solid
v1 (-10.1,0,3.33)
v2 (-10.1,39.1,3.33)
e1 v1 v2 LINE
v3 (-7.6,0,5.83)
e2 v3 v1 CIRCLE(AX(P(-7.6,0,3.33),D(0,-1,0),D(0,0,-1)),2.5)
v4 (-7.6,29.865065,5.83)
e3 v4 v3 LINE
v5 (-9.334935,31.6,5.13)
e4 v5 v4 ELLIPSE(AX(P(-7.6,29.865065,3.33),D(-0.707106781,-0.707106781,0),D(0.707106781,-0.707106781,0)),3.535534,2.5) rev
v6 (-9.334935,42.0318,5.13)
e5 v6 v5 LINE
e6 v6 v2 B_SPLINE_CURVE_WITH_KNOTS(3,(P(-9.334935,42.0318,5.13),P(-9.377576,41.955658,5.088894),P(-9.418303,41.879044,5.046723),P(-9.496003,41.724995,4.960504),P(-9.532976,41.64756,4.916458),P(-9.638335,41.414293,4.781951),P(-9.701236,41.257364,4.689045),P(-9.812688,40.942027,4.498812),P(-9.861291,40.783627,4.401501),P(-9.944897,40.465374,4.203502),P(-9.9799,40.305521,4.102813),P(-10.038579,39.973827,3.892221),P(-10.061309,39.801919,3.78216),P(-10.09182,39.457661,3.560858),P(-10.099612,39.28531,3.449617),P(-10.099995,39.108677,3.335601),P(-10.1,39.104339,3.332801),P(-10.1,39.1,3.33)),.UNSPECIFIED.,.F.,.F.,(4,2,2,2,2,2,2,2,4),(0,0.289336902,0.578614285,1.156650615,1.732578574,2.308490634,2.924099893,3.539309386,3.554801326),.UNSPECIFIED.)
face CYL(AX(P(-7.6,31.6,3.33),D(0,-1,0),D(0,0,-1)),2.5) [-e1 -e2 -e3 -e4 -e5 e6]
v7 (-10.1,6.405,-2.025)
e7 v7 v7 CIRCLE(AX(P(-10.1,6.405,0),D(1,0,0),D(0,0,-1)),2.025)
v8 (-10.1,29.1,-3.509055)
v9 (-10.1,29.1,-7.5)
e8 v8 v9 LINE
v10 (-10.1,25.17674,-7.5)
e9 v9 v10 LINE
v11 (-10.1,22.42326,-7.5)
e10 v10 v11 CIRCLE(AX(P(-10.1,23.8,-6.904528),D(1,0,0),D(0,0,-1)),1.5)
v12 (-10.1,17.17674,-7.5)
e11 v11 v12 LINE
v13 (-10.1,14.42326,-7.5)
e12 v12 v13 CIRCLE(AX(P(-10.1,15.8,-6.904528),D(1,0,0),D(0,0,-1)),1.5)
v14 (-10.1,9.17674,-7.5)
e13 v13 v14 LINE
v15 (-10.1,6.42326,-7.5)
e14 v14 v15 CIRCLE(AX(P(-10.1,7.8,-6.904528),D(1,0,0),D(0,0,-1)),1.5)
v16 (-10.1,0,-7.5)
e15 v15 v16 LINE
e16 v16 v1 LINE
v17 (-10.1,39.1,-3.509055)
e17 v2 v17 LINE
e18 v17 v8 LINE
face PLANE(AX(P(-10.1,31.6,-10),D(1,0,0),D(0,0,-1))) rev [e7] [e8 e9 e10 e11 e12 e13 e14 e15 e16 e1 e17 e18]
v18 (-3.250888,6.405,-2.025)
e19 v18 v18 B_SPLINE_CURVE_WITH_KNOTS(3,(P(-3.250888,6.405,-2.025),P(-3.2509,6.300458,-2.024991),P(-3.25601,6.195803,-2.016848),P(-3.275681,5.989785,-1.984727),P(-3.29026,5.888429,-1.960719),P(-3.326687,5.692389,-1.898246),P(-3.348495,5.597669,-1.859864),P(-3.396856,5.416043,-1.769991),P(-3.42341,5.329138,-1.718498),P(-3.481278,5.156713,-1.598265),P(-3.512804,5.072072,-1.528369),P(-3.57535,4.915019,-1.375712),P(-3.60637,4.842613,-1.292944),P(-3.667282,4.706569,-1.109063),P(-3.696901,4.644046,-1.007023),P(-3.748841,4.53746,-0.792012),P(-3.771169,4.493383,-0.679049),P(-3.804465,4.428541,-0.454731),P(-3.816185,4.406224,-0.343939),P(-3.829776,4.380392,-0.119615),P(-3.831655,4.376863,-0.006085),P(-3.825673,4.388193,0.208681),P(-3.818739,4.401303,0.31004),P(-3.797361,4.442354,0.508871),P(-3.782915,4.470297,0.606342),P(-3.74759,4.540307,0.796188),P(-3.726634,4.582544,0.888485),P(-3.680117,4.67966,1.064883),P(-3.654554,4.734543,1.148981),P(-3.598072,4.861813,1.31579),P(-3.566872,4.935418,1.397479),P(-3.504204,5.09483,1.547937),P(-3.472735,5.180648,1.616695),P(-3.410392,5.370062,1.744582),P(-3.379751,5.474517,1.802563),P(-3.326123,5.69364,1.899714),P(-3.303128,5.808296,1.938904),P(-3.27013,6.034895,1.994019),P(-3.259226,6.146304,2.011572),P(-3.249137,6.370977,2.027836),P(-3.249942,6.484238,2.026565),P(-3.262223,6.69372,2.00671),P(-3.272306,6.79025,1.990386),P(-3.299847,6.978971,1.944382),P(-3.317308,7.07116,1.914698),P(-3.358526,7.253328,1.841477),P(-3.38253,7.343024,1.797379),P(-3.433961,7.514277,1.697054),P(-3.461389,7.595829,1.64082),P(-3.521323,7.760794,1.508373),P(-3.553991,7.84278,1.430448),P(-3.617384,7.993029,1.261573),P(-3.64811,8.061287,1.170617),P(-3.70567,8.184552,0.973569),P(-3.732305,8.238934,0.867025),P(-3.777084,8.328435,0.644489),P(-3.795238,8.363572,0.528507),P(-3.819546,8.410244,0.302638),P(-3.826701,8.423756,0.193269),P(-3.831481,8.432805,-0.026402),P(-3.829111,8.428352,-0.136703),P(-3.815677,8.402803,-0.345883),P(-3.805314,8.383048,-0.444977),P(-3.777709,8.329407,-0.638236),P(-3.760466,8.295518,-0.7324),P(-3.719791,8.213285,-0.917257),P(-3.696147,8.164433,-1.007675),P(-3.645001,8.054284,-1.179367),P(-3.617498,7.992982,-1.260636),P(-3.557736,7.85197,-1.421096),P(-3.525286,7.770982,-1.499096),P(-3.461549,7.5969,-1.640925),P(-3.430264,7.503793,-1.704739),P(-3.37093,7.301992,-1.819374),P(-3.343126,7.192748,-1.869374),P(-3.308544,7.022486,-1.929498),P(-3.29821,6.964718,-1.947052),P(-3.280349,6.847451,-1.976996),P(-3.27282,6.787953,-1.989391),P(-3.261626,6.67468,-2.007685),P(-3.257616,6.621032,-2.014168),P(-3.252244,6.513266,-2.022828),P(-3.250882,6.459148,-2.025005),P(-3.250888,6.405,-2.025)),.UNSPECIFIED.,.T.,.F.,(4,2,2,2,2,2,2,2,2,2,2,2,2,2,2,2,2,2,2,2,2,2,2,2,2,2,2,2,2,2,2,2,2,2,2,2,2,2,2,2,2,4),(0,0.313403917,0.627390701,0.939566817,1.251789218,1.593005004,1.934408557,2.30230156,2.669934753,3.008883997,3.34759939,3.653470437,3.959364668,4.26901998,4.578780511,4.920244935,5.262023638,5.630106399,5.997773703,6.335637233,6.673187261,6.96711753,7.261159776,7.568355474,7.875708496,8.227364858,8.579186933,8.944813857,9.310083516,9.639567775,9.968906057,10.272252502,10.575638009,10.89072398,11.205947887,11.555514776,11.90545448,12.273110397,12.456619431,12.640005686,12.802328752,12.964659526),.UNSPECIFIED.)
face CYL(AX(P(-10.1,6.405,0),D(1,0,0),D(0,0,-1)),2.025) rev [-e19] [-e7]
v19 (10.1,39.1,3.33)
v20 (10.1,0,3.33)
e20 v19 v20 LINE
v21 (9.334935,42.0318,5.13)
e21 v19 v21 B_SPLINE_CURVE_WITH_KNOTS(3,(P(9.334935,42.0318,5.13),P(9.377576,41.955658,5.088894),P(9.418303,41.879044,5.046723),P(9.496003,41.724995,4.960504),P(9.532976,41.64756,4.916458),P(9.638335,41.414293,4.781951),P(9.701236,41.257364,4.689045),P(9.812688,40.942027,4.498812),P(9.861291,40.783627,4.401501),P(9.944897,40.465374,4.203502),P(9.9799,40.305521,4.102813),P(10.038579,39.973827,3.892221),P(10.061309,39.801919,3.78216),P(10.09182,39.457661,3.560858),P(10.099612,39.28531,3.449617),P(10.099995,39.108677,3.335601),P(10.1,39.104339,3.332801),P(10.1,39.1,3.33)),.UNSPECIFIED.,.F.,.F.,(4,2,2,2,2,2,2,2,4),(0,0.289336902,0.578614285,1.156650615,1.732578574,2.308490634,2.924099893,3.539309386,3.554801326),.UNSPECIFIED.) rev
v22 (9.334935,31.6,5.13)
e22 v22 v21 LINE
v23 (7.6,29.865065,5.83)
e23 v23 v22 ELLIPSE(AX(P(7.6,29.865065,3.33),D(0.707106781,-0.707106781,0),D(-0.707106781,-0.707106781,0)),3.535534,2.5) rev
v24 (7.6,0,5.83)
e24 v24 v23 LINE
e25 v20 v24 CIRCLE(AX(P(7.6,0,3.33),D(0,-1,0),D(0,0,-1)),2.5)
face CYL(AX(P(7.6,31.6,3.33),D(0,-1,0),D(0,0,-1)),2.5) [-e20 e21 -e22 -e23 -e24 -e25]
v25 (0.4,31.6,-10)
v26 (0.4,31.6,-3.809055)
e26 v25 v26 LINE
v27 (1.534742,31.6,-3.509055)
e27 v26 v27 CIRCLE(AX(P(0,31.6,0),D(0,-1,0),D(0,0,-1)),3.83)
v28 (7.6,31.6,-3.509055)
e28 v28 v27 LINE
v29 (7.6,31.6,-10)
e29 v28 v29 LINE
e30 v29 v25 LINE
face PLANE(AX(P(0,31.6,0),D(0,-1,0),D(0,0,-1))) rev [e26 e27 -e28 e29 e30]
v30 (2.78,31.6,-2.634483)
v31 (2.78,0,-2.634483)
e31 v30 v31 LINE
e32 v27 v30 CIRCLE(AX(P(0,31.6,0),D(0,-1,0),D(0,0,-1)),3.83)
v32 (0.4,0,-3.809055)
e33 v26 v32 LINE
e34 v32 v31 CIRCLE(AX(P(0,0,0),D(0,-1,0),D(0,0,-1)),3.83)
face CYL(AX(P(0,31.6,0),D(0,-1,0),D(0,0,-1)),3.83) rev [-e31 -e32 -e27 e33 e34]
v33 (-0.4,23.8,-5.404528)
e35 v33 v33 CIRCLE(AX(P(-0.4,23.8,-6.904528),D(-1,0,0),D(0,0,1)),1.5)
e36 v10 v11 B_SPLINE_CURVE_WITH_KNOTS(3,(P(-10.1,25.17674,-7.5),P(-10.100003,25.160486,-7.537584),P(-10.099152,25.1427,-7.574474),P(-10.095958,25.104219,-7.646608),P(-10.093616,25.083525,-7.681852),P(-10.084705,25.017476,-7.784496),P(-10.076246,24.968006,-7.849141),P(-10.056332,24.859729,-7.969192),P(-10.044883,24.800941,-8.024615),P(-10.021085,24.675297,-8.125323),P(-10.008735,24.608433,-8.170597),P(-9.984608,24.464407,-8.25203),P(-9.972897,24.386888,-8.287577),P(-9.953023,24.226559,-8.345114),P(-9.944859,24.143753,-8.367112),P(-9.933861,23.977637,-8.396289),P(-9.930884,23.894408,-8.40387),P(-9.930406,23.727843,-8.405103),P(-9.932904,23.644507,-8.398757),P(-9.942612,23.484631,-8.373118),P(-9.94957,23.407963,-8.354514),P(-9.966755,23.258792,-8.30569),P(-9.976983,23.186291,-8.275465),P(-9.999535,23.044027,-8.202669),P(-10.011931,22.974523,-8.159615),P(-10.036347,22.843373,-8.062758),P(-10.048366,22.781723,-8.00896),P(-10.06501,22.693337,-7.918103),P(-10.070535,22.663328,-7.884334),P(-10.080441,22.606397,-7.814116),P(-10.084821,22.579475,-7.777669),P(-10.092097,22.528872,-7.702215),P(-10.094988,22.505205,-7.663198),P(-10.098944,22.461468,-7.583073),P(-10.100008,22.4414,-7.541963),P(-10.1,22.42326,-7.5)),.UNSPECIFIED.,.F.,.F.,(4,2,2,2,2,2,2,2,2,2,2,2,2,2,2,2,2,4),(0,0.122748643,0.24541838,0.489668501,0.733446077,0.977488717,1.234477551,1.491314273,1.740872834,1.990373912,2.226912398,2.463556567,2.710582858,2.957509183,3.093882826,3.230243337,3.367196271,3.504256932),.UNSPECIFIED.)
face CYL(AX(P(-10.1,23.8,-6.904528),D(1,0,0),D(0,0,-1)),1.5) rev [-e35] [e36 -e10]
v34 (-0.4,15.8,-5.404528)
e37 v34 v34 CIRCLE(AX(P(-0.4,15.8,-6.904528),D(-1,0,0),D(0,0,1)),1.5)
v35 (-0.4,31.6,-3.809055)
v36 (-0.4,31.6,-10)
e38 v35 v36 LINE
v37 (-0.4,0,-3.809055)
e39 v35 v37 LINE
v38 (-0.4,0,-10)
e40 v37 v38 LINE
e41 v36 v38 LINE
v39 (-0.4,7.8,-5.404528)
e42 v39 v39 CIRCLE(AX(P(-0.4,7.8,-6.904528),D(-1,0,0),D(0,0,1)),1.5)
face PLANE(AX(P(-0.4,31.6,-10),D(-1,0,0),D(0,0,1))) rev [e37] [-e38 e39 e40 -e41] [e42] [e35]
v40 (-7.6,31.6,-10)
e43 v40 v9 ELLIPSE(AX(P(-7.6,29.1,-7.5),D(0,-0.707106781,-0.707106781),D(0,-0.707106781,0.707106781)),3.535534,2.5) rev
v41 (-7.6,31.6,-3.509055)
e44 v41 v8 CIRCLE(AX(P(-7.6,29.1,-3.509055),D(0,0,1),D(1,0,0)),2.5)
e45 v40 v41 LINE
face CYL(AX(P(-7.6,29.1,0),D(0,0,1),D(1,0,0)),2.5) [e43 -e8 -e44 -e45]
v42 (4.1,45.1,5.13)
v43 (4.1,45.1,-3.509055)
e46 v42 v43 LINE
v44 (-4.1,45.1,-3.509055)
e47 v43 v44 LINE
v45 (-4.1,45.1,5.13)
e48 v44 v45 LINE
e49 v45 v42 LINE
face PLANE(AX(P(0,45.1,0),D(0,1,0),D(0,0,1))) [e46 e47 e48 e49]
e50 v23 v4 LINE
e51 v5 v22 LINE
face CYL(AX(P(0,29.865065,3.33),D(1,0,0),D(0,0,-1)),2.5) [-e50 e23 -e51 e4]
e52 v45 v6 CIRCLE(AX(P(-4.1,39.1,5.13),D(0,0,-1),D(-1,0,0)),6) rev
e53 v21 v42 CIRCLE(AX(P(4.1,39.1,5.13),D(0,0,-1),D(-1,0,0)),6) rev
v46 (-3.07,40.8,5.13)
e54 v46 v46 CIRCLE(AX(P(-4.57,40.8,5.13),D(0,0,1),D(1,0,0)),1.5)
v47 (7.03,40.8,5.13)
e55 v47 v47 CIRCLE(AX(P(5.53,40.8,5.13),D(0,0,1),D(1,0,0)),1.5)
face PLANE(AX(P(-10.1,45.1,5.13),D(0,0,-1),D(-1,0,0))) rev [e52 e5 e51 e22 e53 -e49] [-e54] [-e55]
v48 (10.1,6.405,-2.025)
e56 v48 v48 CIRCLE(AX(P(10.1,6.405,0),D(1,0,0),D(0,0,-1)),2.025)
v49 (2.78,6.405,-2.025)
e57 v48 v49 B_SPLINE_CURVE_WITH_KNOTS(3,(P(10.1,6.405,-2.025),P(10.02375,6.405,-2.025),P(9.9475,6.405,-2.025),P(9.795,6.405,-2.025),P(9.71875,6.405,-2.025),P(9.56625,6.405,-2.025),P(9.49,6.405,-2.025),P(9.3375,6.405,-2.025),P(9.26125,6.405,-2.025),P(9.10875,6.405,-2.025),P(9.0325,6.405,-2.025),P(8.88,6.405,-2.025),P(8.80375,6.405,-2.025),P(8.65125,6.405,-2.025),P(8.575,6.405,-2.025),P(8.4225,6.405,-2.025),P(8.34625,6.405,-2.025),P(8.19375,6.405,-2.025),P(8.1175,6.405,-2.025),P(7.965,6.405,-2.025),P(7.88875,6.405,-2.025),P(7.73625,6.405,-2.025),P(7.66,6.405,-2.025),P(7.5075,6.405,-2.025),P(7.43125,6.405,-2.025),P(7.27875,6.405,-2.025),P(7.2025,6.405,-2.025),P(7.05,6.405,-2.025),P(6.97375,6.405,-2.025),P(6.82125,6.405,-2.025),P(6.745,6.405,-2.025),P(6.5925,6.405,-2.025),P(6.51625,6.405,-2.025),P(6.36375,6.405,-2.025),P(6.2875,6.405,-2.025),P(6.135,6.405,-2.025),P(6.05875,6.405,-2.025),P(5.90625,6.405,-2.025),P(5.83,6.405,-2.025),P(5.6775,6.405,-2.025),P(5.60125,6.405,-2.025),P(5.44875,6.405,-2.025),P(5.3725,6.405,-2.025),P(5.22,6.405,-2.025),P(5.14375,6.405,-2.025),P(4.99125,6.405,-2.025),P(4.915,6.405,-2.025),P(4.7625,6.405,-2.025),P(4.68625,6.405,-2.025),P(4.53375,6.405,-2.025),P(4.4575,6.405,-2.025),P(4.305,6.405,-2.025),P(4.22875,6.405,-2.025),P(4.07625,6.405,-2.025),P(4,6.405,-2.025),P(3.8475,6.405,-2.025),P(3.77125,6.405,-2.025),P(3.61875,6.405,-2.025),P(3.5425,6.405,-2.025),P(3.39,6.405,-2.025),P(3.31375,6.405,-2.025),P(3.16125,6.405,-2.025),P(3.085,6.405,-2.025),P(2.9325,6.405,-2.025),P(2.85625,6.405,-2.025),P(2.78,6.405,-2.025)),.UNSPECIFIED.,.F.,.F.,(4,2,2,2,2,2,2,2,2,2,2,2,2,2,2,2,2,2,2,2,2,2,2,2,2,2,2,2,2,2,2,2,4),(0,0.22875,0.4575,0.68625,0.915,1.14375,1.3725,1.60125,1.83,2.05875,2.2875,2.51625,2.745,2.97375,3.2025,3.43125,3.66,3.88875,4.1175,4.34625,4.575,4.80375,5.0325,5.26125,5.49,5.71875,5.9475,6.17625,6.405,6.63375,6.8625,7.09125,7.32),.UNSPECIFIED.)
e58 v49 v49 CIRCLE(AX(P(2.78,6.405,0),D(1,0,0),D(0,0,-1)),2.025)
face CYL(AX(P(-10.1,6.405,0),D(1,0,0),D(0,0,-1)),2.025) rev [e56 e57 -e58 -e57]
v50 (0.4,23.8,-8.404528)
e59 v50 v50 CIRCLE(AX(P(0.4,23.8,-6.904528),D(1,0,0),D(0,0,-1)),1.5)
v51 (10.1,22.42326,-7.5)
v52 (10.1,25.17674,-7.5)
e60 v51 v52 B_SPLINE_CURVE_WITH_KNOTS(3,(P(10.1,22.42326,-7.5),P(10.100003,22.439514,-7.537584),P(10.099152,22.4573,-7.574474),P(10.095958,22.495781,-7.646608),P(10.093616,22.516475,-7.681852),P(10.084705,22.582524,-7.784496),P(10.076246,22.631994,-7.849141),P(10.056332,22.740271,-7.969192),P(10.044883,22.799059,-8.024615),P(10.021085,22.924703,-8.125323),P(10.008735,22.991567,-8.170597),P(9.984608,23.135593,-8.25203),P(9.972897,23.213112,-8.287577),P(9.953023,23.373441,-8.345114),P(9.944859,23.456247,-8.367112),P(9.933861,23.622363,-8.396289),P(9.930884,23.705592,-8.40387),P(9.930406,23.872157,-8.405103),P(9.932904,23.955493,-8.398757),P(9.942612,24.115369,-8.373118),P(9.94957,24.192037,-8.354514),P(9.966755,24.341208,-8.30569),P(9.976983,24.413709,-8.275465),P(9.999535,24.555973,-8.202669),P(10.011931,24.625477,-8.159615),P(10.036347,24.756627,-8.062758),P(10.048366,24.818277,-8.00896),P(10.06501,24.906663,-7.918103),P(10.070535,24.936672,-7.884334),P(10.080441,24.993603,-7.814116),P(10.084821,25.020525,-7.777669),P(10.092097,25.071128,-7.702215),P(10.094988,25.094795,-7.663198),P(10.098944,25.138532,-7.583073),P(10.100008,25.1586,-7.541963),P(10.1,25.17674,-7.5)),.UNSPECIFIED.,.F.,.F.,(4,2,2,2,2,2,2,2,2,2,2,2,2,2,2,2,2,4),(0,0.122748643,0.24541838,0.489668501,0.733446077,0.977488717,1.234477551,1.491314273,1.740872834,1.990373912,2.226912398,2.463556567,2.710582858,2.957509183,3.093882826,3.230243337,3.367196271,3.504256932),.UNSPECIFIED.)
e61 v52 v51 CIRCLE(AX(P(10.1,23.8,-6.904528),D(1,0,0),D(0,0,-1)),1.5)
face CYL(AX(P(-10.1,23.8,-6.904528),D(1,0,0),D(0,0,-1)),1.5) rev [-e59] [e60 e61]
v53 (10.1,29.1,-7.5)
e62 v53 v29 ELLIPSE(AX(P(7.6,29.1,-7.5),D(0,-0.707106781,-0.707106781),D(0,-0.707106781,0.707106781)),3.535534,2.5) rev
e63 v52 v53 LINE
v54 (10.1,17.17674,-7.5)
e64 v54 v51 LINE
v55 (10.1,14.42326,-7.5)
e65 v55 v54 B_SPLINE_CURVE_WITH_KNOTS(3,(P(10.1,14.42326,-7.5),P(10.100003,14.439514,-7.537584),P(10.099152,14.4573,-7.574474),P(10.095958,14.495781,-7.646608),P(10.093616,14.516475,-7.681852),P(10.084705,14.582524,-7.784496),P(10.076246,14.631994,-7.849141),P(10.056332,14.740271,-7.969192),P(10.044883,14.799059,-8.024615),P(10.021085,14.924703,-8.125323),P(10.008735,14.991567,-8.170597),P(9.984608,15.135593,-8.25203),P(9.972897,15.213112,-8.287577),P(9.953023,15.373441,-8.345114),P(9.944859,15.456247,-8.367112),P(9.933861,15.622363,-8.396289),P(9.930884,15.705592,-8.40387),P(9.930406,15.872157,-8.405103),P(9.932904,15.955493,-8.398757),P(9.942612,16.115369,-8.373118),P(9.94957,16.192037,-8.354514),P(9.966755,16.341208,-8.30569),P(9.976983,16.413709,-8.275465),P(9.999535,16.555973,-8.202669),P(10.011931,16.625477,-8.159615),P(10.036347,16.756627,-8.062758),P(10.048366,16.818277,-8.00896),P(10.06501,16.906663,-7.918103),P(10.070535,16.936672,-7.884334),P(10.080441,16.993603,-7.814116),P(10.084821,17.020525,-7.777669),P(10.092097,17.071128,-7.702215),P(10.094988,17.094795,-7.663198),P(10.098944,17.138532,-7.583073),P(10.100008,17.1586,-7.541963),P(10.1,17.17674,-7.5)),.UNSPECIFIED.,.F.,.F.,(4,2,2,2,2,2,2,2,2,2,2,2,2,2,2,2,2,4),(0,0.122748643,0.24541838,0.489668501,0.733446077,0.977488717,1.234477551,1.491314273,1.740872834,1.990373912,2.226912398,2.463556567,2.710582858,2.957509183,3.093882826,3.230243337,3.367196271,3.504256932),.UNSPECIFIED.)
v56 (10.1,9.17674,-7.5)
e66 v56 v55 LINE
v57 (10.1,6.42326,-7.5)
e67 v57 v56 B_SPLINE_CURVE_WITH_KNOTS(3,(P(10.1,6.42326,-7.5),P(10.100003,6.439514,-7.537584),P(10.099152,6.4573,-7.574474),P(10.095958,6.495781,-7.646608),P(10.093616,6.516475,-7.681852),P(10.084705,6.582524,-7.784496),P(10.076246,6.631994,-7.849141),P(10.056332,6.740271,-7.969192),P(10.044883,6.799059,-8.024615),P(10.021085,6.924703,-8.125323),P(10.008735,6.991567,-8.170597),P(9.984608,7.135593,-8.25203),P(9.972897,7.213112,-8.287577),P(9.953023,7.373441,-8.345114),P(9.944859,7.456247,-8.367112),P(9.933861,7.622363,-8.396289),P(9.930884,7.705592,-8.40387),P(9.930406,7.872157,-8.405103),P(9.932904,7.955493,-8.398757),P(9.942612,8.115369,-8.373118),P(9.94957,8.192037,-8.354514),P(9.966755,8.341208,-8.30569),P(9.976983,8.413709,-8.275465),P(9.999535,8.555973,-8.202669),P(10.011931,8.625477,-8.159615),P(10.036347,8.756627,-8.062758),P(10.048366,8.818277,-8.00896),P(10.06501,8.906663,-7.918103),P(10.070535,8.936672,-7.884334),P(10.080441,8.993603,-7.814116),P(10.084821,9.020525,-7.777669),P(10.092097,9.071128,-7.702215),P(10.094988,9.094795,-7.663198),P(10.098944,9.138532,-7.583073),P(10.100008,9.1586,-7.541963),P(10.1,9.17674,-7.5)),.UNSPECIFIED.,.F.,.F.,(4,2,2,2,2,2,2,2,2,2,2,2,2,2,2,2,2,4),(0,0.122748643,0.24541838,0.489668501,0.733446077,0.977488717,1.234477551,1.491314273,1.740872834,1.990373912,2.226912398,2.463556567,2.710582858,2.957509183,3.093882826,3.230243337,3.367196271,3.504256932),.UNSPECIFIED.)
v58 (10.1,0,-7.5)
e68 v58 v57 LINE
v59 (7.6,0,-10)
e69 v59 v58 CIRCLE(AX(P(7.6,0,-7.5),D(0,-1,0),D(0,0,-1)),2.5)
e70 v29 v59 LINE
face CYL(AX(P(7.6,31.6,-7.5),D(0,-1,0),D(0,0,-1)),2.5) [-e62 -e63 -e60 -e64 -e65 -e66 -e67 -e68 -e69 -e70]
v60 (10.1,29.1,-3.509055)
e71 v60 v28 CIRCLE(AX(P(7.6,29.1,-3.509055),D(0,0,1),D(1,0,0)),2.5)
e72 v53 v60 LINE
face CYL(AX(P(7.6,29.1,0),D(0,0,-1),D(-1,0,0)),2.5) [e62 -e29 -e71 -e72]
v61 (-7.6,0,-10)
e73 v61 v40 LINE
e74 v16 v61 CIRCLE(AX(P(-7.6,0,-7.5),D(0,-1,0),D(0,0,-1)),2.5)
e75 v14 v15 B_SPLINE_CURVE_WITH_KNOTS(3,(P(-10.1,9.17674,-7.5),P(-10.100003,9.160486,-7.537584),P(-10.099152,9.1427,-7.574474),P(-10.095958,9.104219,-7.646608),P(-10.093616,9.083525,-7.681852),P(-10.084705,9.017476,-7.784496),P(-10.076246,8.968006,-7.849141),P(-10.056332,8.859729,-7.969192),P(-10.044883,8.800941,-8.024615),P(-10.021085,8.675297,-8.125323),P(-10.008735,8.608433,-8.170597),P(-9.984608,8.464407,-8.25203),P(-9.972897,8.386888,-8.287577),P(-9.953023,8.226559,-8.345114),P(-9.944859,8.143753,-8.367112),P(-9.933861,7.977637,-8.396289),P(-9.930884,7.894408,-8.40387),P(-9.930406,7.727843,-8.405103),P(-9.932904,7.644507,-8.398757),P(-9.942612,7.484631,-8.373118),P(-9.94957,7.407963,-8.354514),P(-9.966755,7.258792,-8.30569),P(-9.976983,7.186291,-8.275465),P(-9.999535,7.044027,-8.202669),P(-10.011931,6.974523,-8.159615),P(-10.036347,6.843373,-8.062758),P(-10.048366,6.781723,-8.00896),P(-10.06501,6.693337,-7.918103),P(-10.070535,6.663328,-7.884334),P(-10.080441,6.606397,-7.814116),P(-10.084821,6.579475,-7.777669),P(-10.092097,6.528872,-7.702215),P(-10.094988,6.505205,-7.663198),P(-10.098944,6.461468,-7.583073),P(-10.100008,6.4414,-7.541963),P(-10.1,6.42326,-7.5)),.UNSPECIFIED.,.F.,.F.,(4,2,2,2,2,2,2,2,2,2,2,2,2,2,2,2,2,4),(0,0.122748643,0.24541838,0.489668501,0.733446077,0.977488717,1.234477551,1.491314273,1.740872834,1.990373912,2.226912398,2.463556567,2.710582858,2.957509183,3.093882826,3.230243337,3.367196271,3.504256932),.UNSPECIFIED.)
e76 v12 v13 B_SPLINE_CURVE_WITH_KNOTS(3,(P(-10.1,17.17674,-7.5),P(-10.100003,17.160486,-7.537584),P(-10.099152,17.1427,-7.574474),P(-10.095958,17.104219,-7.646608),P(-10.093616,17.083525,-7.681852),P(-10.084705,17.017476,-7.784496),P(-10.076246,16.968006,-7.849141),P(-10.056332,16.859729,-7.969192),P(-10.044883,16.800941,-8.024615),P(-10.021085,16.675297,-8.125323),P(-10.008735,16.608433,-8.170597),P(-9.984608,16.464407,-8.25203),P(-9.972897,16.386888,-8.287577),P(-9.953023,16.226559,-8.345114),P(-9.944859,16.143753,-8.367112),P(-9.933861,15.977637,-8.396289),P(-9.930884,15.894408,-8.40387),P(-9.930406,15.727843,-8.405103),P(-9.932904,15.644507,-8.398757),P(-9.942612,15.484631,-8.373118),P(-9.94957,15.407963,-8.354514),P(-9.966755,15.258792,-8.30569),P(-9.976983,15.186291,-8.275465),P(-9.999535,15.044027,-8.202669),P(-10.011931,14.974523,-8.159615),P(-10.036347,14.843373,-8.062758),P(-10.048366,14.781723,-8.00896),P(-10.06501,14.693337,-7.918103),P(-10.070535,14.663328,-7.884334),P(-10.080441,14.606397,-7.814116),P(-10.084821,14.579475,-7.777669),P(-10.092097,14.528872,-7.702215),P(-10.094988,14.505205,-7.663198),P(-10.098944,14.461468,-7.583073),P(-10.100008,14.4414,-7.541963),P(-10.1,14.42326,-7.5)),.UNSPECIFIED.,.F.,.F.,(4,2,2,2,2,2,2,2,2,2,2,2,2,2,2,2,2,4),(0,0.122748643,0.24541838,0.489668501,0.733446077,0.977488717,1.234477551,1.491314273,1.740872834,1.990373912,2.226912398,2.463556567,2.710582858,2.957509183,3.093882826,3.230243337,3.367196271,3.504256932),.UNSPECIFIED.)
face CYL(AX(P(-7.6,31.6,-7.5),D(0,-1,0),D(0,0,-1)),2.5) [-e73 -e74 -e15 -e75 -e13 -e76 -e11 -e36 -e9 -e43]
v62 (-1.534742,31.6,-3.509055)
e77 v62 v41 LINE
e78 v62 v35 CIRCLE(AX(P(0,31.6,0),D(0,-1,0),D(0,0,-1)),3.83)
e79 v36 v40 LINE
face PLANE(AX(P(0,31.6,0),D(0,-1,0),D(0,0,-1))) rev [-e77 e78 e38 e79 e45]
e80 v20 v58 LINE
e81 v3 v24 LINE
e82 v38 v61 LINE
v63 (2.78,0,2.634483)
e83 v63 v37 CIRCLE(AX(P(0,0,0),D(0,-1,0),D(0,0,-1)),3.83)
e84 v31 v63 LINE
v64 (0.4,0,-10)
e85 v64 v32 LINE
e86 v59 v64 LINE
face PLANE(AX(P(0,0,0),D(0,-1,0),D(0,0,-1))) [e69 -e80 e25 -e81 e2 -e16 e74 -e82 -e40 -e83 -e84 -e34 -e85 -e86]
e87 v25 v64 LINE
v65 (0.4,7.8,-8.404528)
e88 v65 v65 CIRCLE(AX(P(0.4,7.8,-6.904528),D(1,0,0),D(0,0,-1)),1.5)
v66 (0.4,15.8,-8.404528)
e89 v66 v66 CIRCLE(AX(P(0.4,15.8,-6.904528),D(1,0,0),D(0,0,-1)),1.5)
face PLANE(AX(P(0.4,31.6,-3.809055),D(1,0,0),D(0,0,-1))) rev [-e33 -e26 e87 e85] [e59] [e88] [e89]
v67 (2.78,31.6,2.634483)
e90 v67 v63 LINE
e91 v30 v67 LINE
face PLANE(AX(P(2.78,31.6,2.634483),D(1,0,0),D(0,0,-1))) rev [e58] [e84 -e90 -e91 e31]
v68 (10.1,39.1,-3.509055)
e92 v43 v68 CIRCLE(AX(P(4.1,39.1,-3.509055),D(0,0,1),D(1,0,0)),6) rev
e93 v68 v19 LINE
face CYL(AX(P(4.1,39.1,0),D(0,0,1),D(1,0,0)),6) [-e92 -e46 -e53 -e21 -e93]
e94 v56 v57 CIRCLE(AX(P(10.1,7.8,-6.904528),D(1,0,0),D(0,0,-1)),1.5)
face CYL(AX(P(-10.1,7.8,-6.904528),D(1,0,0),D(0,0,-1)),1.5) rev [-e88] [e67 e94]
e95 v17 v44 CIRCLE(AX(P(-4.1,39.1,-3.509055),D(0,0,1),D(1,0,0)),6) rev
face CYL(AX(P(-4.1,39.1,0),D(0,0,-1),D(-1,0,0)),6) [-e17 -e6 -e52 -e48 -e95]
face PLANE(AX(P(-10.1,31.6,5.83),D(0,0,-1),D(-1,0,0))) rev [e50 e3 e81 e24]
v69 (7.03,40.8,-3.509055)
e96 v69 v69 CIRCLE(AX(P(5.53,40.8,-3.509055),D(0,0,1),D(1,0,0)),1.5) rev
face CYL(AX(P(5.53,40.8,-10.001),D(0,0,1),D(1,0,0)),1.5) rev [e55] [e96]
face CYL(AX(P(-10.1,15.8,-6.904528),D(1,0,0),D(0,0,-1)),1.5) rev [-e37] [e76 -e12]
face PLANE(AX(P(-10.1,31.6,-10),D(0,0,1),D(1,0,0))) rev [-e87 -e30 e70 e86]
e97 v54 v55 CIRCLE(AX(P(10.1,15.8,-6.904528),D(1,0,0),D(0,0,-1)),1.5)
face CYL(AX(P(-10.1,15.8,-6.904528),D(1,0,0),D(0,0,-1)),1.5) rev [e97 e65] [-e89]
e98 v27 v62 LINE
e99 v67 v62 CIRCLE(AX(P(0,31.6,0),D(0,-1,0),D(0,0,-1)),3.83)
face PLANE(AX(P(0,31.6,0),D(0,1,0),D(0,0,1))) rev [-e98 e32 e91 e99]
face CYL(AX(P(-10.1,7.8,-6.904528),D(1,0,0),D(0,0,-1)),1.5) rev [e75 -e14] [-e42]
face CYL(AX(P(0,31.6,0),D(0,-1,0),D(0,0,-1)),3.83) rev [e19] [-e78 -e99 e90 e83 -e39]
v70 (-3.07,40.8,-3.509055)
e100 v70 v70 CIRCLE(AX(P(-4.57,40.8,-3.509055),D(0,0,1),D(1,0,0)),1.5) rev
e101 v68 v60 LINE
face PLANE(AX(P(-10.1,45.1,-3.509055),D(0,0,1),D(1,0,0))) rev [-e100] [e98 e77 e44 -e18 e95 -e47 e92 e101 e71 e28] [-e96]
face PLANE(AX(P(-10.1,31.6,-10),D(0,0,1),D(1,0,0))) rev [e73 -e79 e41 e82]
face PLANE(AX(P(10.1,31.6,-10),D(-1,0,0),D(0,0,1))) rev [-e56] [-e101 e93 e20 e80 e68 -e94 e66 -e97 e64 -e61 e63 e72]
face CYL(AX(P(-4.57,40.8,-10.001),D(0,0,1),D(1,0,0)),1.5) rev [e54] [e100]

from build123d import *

# Parameters (mm, degrees)
CROQUIS1_W                 = 20.2
CROQUIS1_H                 = 15.83
SALIENTE_EXTRUIR1_DEPTH    = 31.6
CORTAR_EXTRUIR4_DEPTH      = 31.6
CORTAR_EXTRUIR5_DEPTH      = 35.649242416
CORTAR_EXTRUIR6_DEPTH      = 35.649242416
CORTAR_EXTRUIR6_DEPTH_BACK = 35.649242416
CROQUIS5_R                 = 2.025
CROQUIS6_R                 = 1.5
CORTAR_EXTRUIR7_DEPTH      = 39.814945709
CROQUIS10_W                = 20.2
CROQUIS10_H                = 8.639055001
SALIENTE_EXTRUIR4_DEPTH    = 13.5
CORTAR_EXTRUIR8_REACH      = 50.631
CROQUIS11_R                = 1.5
REDONDEO2_START            = -1
REDONDEO2_DEPTH            = 47
REDONDEO2_START_2          = -10
REDONDEO2_2_DEPTH          = 20
REDONDEO2_START_3          = -11
REDONDEO2_3_DEPTH          = 7.490944999
REDONDEO3_R                = 6


with BuildPart() as part:
    # Croquis1 → Saliente-Extruir1 (new body)
    with BuildSketch(Plane(origin=(0, 0, 0), x_dir=(1, 0, 0), z_dir=(0, 1, 0))):
        with Locations((0, 2.085)):
            Rectangle(CROQUIS1_W, CROQUIS1_H)
    extrude(amount=SALIENTE_EXTRUIR1_DEPTH)

    # Croquis2 → Cortar-Extruir4 (cut)
    with BuildSketch(Plane.XZ):
        with BuildLine():
            Line((2.78, 2.634482871), (2.78, -2.634482871))
            ThreePointArc((2.78, -2.634482871), (-3.83, 0), (2.78, 2.634482871))
        make_face()
    extrude(amount=-CORTAR_EXTRUIR4_DEPTH, mode=Mode.SUBTRACT)

    # Croquis4 → Cortar-Extruir5 (cut, through all)
    with BuildSketch(Plane.XZ):
        with BuildLine():
            Line((-0.4, -10), (-0.4, -3.809055001))
            ThreePointArc((-0.4, -3.809055001), (0, -3.83), (0.4, -3.809055001))
            Line((0.4, -3.809055001), (0.4, -10))
            Line((0.4, -10), (-0.4, -10))
        make_face()
    extrude(amount=-CORTAR_EXTRUIR5_DEPTH, mode=Mode.SUBTRACT)

    # Croquis5 → Cortar-Extruir6 (cut, two sides: drawn at the far end of the back side and taken through both)
    with BuildSketch(Plane(origin=(0, 0, 0), x_dir=(0, 0, -1), z_dir=(1, 0, 0)).offset(-CORTAR_EXTRUIR6_DEPTH_BACK)):
        with Locations((0, 6.405)):
            Circle(CROQUIS5_R)
    extrude(amount=CORTAR_EXTRUIR6_DEPTH + CORTAR_EXTRUIR6_DEPTH_BACK, mode=Mode.SUBTRACT)

    # Croquis6 → Cortar-Extruir7 (cut, through all)
    with BuildSketch(Plane(origin=(10.1, 0, 0), x_dir=(0, 0, -1), z_dir=(1, 0, 0))):
        with Locations((6.9045275, 23.8)):
            Circle(CROQUIS6_R)
        with Locations((6.9045275, 15.8)):
            Circle(CROQUIS6_R)
        with Locations((6.9045275, 7.8)):
            Circle(CROQUIS6_R)
    extrude(amount=-CORTAR_EXTRUIR7_DEPTH, mode=Mode.SUBTRACT)

    # Croquis10 → Saliente-Extruir4 (add)
    with BuildSketch(Plane(origin=(0, 31.6, 0), x_dir=(1, 0, 0), z_dir=(0, 1, 0))):
        with Locations((0, -0.810472499)):
            Rectangle(CROQUIS10_W, CROQUIS10_H)
    extrude(amount=SALIENTE_EXTRUIR4_DEPTH)

    # Croquis11 → Cortar-Extruir8 (cut, up to next)
    with BuildSketch(Plane.XY.offset(5.13), mode=Mode.PRIVATE) as cortar_extruir8_sk1:
        with Locations((-4.57, 40.8)):
            Circle(CROQUIS11_R)
    cortar_extruir8_tool1 = extrude(cortar_extruir8_sk1.sketch, amount=-CORTAR_EXTRUIR8_REACH, mode=Mode.PRIVATE) & part.part
    # Croquis11 → Cortar-Extruir8 (cut, up to next)
    with BuildSketch(Plane.XY.offset(5.13), mode=Mode.PRIVATE) as cortar_extruir8_sk2:
        with Locations((5.53, 40.8)):
            Circle(CROQUIS11_R)
    cortar_extruir8_tool2 = extrude(cortar_extruir8_sk2.sketch, amount=-CORTAR_EXTRUIR8_REACH, mode=Mode.PRIVATE) & part.part
    add(cortar_extruir8_tool1.solids().sort_by_distance((-4.57, 40.8, 5.13))[0], mode=Mode.SUBTRACT)
    add(cortar_extruir8_tool2.solids().sort_by_distance((5.53, 40.8, 5.13))[0], mode=Mode.SUBTRACT)

    # Redondeo2: read off the stored shape, not the designer's step
    # Redondeo2 outline → Redondeo2 (cut)
    with BuildSketch(Plane(origin=(0, 0, 0), x_dir=(1, 0, 0), z_dir=(0, 1, 0)).offset(REDONDEO2_START)):
        with BuildLine():
            Line((-10.1, -5.83), (-7.6, -5.83))
            ThreePointArc((-7.6, -5.83), (-9.367766953, -5.097766953), (-10.1, -3.33))
            Line((-10.1, -3.33), (-10.1, -5.83))
        make_face()
        with BuildLine():
            ThreePointArc((7.6, 10), (9.367766953, 9.267766953), (10.1, 7.5))
            Line((10.1, 7.5), (10.1, 10))
            Line((10.1, 10), (7.6, 10))
        make_face()
        with BuildLine():
            ThreePointArc((10.1, -3.33), (9.367766953, -5.097766953), (7.6, -5.83))
            Line((7.6, -5.83), (10.1, -5.83))
            Line((10.1, -5.83), (10.1, -3.33))
        make_face()
        with BuildLine():
            Line((-10.1, 10), (-10.1, 7.5))
            ThreePointArc((-10.1, 7.5), (-9.367766953, 9.267766953), (-7.6, 10))
            Line((-7.6, 10), (-10.1, 10))
        make_face()
    extrude(amount=REDONDEO2_DEPTH, mode=Mode.SUBTRACT)

    # Redondeo2 2 outline → Redondeo2 2 (cut)
    with BuildSketch(Plane.YZ.offset(REDONDEO2_START_2)):
        with BuildLine():
            ThreePointArc((29.865064843, 5.83), (30.80047919, 5.648404624), (31.6, 5.13))
            Line((31.6, 5.13), (31.6, 5.83))
            Line((31.6, 5.83), (29.865064843, 5.83))
        make_face()
    extrude(amount=REDONDEO2_2_DEPTH, mode=Mode.SUBTRACT)

    # Redondeo2 3 outline → Redondeo2 3 (cut)
    with BuildSketch(Plane.XY.offset(REDONDEO2_START_3)):
        with BuildLine():
            Line((10.1, 31.6), (7.6, 31.6))
            ThreePointArc((7.6, 31.6), (9.367766953, 30.867766953), (10.1, 29.1))
            Line((10.1, 29.1), (10.1, 31.6))
        make_face()
        with BuildLine():
            ThreePointArc((-10.1, 29.1), (-9.367766953, 30.867766953), (-7.6, 31.6))
            Line((-7.6, 31.6), (-10.1, 31.6))
            Line((-10.1, 31.6), (-10.1, 29.1))
        make_face()
    extrude(amount=REDONDEO2_3_DEPTH, mode=Mode.SUBTRACT)

    # Redondeo3
    # the kernel refuses this fillet: 6 mm, written as the material it takes off along each edge
    with BuildSketch(Plane(origin=(-10.1, 45.1, 18.33), x_dir=(1, 0, 0), z_dir=(0, 0, -1))) as redondeo3_piece_1:
        with BuildLine():
            CenterArc((REDONDEO3_R, REDONDEO3_R), REDONDEO3_R, 180, 90)
            Line((0, REDONDEO3_R), (0, 0))
            Line((0, 0), (REDONDEO3_R, 0))
        make_face()
    extrude(amount=36.839055001, mode=Mode.SUBTRACT)
    with BuildSketch(Plane(origin=(10.1, 45.1, -18.509055001), x_dir=(0, -1, 0), z_dir=(0, 0, 1))) as redondeo3_piece_2:
        with BuildLine():
            CenterArc((REDONDEO3_R, -REDONDEO3_R), REDONDEO3_R, 90, 90)
            Line((0, -REDONDEO3_R), (0, 0))
            Line((0, 0), (REDONDEO3_R, 0))
        make_face()
    extrude(amount=36.839055001, mode=Mode.SUBTRACT)


solid = part.part
